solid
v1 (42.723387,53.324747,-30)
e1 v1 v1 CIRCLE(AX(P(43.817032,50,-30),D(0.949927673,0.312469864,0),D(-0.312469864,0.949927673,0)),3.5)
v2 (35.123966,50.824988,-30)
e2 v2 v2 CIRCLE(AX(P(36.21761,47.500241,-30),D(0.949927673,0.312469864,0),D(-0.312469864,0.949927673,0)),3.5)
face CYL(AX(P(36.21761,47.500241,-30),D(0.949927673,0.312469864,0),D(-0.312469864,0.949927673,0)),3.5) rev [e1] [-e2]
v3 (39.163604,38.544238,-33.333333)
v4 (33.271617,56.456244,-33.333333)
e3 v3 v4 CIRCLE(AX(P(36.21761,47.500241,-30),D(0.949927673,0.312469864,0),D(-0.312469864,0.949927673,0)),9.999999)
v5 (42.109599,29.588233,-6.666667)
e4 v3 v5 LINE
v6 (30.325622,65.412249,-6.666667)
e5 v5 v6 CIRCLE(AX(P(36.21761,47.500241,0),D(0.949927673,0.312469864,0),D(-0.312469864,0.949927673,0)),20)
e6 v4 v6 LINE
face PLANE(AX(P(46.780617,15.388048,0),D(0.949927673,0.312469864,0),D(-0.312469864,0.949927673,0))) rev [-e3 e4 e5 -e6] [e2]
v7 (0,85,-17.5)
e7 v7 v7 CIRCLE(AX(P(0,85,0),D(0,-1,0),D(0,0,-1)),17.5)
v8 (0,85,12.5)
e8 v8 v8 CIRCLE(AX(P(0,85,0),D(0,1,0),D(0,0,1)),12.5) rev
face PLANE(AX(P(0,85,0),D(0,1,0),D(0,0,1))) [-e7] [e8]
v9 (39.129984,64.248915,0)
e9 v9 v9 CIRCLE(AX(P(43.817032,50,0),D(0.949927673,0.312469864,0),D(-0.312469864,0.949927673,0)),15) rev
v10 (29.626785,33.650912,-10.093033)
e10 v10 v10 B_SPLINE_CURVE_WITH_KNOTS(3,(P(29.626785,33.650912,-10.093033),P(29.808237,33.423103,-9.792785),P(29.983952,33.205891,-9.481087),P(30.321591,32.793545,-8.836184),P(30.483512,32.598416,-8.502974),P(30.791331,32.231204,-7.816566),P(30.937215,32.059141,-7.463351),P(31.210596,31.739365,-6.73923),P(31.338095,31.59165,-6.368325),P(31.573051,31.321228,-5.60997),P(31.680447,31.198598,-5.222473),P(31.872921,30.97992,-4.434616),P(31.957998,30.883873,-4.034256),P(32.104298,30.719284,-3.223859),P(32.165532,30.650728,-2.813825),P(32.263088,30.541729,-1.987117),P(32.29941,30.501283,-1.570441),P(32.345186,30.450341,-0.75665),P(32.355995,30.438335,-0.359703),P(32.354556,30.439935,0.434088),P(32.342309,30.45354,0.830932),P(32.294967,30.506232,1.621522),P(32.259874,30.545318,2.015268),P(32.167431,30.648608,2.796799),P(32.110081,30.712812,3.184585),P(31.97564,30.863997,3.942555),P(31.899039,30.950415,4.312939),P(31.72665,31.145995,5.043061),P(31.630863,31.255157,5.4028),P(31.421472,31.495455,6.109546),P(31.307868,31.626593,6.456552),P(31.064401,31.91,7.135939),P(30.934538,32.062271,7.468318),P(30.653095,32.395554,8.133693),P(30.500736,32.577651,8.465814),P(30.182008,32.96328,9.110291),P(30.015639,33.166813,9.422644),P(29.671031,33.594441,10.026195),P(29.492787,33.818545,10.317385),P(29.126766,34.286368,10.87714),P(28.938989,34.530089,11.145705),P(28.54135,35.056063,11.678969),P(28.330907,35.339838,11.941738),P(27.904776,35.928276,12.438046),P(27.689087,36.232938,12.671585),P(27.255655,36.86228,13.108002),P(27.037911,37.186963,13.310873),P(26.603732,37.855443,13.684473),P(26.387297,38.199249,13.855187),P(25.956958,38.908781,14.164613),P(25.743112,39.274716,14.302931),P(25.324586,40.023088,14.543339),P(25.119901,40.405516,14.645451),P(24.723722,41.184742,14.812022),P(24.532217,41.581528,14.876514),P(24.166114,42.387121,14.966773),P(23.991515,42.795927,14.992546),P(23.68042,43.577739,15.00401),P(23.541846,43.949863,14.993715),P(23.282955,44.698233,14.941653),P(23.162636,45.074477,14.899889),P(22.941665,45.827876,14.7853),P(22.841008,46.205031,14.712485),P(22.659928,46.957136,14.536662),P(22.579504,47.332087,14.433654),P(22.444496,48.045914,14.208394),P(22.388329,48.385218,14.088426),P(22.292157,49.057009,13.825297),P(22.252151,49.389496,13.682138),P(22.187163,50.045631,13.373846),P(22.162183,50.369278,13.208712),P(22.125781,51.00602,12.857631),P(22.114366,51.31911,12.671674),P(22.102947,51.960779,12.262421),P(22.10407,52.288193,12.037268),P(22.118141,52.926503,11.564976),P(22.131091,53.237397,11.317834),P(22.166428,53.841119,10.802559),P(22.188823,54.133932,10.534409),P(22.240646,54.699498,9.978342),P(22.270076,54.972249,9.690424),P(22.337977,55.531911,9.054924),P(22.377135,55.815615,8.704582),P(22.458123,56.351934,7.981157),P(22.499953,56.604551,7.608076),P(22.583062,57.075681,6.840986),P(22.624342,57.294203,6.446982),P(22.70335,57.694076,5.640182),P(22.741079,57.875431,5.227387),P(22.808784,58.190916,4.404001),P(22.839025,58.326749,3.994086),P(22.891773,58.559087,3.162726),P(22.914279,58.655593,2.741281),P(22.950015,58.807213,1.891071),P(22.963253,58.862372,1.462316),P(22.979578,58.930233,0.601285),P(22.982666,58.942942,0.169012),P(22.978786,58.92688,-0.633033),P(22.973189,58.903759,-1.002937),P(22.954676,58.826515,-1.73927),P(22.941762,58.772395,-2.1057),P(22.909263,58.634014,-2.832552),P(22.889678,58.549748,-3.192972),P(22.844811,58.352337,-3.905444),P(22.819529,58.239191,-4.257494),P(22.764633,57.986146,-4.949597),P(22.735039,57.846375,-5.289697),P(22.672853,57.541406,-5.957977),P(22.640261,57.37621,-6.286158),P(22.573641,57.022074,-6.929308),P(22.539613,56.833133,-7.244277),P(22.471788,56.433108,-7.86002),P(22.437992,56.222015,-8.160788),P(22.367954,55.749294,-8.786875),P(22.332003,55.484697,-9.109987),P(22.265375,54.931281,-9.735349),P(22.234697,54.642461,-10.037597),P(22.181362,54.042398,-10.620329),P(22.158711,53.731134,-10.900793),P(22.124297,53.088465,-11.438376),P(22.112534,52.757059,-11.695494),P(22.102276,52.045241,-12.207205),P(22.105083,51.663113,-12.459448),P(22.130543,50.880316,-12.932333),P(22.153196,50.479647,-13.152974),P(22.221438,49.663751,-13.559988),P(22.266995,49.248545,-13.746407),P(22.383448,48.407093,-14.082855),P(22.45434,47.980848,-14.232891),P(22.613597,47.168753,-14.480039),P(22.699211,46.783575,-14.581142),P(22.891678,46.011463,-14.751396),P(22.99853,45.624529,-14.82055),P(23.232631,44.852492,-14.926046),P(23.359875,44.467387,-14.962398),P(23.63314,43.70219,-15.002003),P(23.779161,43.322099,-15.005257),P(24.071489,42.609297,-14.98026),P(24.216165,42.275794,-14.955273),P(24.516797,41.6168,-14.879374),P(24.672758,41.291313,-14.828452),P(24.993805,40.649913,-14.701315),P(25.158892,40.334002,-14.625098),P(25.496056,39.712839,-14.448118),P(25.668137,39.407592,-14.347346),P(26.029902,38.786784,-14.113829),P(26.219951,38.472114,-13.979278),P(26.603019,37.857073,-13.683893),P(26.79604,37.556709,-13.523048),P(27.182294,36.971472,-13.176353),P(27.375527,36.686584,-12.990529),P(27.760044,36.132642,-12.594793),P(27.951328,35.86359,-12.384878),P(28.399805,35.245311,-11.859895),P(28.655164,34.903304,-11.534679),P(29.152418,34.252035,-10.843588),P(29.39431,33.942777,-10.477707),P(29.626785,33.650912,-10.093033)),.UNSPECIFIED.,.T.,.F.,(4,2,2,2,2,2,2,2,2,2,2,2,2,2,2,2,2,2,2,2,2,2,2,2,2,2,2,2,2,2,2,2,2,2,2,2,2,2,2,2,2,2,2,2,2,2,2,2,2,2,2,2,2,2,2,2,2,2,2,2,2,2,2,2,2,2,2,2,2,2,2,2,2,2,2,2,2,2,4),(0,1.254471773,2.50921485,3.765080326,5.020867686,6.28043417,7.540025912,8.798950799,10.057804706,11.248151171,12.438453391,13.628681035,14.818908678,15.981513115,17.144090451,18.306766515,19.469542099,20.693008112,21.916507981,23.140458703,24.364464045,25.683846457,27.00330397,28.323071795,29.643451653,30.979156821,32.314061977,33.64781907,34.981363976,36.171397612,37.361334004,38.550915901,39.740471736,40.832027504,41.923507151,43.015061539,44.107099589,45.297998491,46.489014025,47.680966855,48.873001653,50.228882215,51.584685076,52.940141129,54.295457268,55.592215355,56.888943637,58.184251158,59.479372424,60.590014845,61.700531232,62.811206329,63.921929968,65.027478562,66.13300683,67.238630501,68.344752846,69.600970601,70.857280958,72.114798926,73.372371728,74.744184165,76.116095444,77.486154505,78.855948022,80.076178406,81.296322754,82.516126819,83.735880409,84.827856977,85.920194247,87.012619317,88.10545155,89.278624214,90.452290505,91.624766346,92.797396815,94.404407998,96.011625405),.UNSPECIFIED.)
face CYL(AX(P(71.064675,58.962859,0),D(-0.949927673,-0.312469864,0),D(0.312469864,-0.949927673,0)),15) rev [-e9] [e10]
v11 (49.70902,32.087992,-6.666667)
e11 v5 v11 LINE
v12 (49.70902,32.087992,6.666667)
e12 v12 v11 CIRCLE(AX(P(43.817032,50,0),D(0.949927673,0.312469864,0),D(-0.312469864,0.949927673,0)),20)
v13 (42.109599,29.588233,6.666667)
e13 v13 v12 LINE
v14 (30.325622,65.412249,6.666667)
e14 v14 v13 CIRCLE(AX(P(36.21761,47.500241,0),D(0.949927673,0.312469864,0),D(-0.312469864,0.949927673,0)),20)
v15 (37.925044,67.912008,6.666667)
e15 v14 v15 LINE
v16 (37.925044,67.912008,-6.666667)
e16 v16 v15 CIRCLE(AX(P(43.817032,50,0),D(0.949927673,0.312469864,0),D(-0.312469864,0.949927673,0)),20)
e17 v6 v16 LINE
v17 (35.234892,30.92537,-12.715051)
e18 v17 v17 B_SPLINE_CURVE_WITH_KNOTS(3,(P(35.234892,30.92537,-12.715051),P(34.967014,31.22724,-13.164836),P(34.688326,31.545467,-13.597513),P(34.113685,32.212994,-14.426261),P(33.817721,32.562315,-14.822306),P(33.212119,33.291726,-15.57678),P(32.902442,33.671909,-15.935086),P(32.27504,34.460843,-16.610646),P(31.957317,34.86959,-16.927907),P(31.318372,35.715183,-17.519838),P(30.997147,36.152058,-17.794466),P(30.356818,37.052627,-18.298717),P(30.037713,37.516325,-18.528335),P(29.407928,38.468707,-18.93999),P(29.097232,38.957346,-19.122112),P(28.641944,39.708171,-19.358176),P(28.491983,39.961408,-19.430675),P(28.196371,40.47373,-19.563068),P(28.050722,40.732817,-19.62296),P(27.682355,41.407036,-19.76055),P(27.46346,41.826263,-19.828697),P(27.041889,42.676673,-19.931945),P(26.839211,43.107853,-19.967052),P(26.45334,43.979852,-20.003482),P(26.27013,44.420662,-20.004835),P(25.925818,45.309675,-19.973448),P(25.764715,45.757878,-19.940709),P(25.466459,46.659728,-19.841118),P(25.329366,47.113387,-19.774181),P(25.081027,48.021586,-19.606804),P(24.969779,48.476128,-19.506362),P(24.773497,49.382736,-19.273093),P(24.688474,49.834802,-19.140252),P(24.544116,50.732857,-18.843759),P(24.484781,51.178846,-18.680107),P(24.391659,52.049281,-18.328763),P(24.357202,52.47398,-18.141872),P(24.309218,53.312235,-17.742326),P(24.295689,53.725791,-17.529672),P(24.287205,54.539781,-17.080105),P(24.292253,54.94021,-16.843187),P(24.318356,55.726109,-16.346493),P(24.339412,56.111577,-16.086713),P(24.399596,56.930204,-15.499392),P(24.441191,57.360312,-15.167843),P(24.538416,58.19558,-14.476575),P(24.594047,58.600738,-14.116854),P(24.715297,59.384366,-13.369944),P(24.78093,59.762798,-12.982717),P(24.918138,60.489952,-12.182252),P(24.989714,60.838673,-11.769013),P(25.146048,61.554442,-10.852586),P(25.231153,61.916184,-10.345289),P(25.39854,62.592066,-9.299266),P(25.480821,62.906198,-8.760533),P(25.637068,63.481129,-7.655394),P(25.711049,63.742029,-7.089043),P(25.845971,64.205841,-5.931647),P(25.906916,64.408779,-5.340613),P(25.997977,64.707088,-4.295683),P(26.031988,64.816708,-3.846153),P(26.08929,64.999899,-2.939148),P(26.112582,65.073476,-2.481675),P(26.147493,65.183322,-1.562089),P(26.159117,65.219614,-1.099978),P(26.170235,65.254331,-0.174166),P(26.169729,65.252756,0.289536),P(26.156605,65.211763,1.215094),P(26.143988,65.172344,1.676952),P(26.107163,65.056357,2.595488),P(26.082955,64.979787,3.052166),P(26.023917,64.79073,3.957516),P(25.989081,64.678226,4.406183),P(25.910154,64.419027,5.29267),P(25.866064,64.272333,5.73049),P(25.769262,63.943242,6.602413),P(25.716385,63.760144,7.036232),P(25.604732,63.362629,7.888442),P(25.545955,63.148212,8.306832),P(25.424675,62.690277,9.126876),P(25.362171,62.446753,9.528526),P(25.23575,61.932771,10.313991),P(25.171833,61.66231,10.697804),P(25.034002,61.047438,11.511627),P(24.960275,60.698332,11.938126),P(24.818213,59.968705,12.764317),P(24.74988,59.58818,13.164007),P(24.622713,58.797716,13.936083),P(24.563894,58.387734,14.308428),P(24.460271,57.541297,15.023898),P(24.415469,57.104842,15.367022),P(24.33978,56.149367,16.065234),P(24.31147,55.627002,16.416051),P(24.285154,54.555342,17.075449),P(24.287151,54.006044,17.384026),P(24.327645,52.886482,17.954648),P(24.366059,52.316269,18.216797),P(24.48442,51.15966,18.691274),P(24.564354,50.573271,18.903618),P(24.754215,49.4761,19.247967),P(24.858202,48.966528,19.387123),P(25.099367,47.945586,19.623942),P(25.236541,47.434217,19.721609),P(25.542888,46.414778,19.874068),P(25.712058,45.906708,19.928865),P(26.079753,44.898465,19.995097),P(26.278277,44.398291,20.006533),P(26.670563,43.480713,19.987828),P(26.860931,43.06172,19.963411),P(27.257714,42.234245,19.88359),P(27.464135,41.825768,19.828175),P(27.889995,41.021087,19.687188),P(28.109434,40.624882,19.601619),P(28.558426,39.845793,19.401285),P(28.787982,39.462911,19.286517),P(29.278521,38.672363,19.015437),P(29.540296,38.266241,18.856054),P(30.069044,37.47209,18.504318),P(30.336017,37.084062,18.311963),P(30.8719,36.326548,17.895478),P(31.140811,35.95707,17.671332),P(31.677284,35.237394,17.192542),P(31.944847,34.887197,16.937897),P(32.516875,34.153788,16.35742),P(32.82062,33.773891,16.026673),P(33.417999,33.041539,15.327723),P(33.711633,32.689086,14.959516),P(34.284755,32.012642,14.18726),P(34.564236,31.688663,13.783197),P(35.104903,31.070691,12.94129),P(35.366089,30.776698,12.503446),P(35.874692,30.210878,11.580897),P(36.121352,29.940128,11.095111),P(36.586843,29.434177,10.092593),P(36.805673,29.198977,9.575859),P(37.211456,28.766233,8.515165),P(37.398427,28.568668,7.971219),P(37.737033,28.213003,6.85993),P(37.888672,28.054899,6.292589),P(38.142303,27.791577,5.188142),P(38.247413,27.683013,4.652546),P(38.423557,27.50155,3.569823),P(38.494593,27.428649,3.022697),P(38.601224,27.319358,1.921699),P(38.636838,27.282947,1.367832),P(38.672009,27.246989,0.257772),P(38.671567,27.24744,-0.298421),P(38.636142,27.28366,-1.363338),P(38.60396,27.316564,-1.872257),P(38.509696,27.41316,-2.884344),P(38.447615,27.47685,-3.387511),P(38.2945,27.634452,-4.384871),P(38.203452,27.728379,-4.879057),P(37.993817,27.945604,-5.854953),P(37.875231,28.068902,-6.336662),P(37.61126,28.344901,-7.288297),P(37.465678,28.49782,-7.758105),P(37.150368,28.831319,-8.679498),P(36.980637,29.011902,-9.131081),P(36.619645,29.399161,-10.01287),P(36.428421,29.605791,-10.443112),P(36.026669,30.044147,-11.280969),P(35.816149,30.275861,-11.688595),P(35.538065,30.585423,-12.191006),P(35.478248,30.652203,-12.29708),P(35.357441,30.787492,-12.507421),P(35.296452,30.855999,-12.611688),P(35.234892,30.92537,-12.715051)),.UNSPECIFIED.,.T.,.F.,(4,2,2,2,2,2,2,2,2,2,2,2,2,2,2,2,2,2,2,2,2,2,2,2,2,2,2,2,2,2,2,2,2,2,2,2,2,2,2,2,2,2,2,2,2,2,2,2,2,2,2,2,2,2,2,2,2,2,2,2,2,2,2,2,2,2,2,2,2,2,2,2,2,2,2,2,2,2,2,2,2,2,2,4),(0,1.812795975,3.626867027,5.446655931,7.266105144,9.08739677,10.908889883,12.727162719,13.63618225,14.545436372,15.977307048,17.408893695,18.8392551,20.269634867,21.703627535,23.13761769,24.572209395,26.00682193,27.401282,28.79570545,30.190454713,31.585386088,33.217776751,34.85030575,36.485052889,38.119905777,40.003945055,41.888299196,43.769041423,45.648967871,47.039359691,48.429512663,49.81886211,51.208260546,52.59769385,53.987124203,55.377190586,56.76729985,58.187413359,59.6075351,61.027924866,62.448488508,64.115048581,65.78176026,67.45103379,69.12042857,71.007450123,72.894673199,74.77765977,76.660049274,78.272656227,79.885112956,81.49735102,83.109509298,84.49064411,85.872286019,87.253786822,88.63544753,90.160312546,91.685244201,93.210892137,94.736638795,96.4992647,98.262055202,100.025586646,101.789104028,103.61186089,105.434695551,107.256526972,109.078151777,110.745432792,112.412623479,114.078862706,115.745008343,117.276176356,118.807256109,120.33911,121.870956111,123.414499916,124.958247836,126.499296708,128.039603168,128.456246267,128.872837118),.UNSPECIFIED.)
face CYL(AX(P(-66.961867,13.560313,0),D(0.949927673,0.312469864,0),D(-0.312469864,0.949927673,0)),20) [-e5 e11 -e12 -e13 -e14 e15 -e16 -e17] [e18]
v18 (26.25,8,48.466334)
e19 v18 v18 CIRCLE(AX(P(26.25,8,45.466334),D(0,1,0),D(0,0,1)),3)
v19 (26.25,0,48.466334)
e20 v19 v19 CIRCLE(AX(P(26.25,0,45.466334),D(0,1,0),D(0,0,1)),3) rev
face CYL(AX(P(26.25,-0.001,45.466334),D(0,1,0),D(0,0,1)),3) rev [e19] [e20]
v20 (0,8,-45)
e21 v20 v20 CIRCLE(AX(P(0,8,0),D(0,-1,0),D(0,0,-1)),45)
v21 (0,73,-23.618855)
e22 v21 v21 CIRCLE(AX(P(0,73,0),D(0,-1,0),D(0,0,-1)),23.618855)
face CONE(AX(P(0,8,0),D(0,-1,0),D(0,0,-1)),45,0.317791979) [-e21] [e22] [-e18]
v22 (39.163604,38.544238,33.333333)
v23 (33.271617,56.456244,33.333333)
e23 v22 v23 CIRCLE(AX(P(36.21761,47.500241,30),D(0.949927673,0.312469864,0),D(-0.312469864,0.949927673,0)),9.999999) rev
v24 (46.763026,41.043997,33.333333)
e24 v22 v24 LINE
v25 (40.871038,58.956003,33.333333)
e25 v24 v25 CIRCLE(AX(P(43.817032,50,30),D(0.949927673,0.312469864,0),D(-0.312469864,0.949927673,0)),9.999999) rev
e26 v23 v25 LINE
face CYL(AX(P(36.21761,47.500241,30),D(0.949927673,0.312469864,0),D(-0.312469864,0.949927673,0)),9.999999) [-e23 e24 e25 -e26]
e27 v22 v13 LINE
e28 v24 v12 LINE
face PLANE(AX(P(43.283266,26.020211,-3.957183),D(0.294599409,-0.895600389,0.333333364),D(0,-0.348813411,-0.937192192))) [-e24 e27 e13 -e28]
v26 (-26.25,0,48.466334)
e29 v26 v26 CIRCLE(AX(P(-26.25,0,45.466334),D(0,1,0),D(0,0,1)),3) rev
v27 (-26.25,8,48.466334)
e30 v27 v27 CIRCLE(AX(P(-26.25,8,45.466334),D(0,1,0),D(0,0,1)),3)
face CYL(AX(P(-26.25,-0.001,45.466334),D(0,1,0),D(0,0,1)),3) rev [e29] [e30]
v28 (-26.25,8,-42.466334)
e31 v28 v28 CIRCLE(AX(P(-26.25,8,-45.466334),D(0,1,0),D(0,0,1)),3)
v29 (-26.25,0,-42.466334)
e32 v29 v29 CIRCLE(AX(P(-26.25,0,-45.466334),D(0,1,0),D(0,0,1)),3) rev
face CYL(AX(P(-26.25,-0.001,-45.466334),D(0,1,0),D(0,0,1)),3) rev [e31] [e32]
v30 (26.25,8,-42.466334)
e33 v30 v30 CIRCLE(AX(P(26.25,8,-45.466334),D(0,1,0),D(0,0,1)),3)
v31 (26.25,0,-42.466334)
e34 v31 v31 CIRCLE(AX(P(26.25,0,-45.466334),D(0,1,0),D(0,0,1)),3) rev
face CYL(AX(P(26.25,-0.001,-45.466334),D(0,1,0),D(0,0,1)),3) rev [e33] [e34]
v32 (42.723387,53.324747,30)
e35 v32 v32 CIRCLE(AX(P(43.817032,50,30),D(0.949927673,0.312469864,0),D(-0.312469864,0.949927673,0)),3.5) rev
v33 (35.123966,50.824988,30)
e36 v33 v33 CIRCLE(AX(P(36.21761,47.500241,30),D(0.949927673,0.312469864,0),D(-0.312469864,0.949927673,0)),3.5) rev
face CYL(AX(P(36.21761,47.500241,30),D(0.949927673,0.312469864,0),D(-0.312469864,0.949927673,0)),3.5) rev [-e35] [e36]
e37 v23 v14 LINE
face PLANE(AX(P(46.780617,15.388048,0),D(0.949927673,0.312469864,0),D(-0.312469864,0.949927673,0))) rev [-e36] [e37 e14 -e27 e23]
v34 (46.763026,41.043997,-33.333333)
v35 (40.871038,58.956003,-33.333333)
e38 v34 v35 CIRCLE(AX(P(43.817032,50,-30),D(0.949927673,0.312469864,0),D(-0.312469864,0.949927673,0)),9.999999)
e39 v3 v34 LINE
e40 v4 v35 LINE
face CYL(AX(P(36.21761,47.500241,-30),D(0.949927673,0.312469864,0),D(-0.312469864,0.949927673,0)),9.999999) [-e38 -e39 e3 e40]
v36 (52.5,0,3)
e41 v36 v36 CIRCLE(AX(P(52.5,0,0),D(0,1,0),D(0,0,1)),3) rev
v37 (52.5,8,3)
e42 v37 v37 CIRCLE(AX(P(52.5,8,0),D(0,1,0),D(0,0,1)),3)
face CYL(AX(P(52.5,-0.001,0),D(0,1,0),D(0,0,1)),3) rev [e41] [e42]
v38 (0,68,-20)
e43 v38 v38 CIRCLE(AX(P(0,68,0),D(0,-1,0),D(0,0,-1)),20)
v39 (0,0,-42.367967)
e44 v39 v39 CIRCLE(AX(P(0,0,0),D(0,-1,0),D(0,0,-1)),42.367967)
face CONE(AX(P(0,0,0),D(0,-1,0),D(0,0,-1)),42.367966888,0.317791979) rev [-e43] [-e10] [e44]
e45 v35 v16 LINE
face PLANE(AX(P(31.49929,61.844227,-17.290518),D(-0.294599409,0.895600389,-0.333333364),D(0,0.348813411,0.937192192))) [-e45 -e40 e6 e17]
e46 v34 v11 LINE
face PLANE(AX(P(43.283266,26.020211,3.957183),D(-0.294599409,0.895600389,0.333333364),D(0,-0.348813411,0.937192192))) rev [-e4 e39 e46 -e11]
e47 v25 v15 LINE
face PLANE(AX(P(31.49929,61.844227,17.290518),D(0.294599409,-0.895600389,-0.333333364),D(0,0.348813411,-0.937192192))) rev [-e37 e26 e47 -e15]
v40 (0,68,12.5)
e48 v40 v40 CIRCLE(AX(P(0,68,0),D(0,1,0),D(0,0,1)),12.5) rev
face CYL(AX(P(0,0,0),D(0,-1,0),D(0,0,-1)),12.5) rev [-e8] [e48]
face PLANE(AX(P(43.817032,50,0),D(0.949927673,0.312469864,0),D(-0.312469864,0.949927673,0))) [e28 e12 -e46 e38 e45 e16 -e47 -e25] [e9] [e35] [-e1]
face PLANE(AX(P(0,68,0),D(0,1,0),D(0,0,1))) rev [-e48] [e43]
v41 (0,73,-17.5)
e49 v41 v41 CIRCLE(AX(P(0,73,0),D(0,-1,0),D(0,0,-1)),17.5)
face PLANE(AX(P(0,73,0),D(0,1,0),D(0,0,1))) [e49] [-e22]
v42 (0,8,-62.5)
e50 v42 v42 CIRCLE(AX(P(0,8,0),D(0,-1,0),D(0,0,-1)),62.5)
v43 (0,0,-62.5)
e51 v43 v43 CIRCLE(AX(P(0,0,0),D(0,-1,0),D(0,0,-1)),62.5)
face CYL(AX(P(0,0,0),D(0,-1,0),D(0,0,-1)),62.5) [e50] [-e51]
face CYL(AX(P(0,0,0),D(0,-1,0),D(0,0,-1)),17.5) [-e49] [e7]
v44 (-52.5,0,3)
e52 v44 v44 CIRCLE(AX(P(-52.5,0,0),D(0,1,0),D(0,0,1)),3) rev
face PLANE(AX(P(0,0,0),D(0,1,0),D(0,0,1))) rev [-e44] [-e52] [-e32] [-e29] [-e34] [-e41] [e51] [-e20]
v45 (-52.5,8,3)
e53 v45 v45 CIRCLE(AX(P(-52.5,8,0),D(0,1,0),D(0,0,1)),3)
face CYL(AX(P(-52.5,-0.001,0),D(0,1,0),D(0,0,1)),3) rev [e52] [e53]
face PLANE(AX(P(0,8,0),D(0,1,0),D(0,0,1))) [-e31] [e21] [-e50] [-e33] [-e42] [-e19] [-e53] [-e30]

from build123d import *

# Parameters (mm, degrees)
SKETCH_4_W              = 17.5
SKETCH_4_H              = 11.999999999999986
SHELL_START             = 68
SHELL_1_OUTLINE_R       = 12.5
SHELL_1_DEPTH           = 17
EXTRUDE_2_REACH         = 143.612
SKETCH_7_R              = 19.99999999999999
SKETCH_8_R              = 3.500000000000001
EXTRUDE_3_DEPTH         = 8
CUT_EXTRUDE_START       = -21.159422762
CUT_EXTRUDE_1_OUTLINE_R = 15
CUT_EXTRUDE_1_DEPTH     = 21.159422762
CUT_EXTRUDE_2_REACH     = 119.224
SKETCH_9_R              = 3.0000000000000013
SKETCH_9_R_2            = 3.0000000000000018
SKETCH_9_R_3            = 2.9999999999999987
SKETCH_9_R_4            = 2.999999999999999


# Read off the part's stored shape, not the designer's step: 抽壳1, 切除-拉伸1
with BuildPart() as part:
    # 草图4 → 旋转1 (revolve)
    with BuildSketch(Plane.XY, mode=Mode.PRIVATE) as revolve_1_sk:
        with Locations((-8.75, 79)):
            Rectangle(SKETCH_4_W, SKETCH_4_H)
        Polygon((-62.5, 8), (-62.5, 0), (-42.367966888227485, 0), (-19.99999999999999, 67.99999999999997), (0, 67.99999999999997), (0, 73.00000000000001), (-17.5, 73.00000000000001), (-23.618855180370783, 73.00000000000001), (-45, 8), align=None)
    revolve(revolve_1_sk.sketch.rotate(Axis((0, 0, 0), (0, 1, 0)), 270), axis=Axis((0, 0, 0), (0, 1, 0)))

    # 抽壳1 outline → 抽壳1 (cut)
    with BuildSketch(Plane(origin=(0, 0, 0), x_dir=(1, 0, 0), z_dir=(0, 1, 0)).offset(SHELL_START)):
        Circle(SHELL_1_OUTLINE_R)
    extrude(amount=SHELL_1_DEPTH, mode=Mode.SUBTRACT)

    # 草图7 → 凸台-拉伸2 (add, up to next)
    with BuildSketch(Plane(origin=(42.98090645471225, 14.138169005955993, 0), x_dir=(0, 0, 1), z_dir=(-0.9499276731466783, -0.31246986381111624, 0)), mode=Mode.PRIVATE) as extrude_2_sk1:
        with Locations(Location((0, 33.804881714770495, 0), (0, 0, 90))):
            Circle(SKETCH_7_R)
    extrude_2_tool1 = extrude(extrude_2_sk1.sketch, amount=EXTRUDE_2_REACH, mode=Mode.PRIVATE) - part.part


with BuildPart() as body_2:
    # 草图6 → 旋转2 (revolve)
    with BuildSketch(Plane.XY):
        Polygon((32.417899669147, 46.25036163426662), (26.1685023929247, 65.24891509720017), (37.56763447068482, 68.99855346293356), (43.81703174690713, 50), align=None)
    revolve(axis=Axis((50.865675487969646, 52.31858573245586, 0), (-0.9499276731466784, -0.31246986381111624, 0)))


with BuildPart() as part_1:
    add(part.part)

    add(body_2.part)  # 凸台-拉伸2 merges body 2
    add(extrude_2_tool1.solids().sort_by_distance((32.4179, 46.250362, 0))[0])
    add(extrude_2_tool1.solids().sort_by_distance((32.4179, 46.250362, 0))[1])

    # 草图8 → 凸台-拉伸3 (add)
    # profile 1 of 2: a face of its own
    with BuildSketch(Plane(origin=(54.38003853247239, 17.88780737168939, 0), x_dir=(0, 0, -1), z_dir=(0.9499276731466783, 0.31246986381111624, 0))):
        with BuildLine():
            ThreePointArc((33.3333333333333, 24.37679227788569), (39.999999077050425, 33.804881714770474), (33.3333333333333, 43.23297115165526))
            Line((33.3333333333333, 43.23297115165526), (6.666667281966372, 52.66106232887043))
            ThreePointArc((6.666667281966377, 52.66106232887044), (16.329931806950803, 45.35188683213041), (19.99999999999999, 33.804881714770495))
            ThreePointArc((19.99999999999999, 33.80488171477049), (16.329931806950796, 22.257876597410572), (6.666667281966361, 14.948701100670544))
            Line((6.666667281966372, 14.948701100670537), (33.3333333333333, 24.376792277885695))
        make_face()
        with Locations(Location((30, 33.80488171477048, 0), (0, 0, 90))):
            Circle(SKETCH_8_R, mode=Mode.SUBTRACT)
    # profile 2 of 2: a face of its own
    with BuildSketch(Plane(origin=(54.38003853247239, 17.88780737168939, 0), x_dir=(0, 0, -1), z_dir=(0.9499276731466783, 0.31246986381111624, 0))):
        with BuildLine():
            ThreePointArc((-6.666667281966367, 14.948701100670544), (-19.99999999999999, 33.804881714770495), (-6.666667281966375, 52.66106232887044))
            Line((-6.666667281966372, 52.66106232887043), (-33.3333333333333, 43.23297115165526))
            ThreePointArc((-33.3333333333333, 43.23297115165526), (-39.999999077050425, 33.804881714770474), (-33.3333333333333, 24.37679227788569))
            Line((-33.3333333333333, 24.376792277885695), (-6.666667281966372, 14.948701100670537))
        make_face()
        with Locations(Location((-30, 33.80488171477048, 0), (0, 0, 90))):
            Circle(SKETCH_8_R, mode=Mode.SUBTRACT)
    extrude(amount=-EXTRUDE_3_DEPTH)

    # 切除-拉伸1 outline → 切除-拉伸1 (cut)
    with BuildSketch(Plane(origin=(54.38003853247239, 17.88780737168939, 0), x_dir=(0, 0, -1), z_dir=(0.9499276731466783, 0.31246986381111624, 0)).offset(CUT_EXTRUDE_START)):
        with Locations((0, 33.804881715)):
            Circle(CUT_EXTRUDE_1_OUTLINE_R)
    extrude(amount=CUT_EXTRUDE_1_DEPTH, mode=Mode.SUBTRACT)

    # 草图9 → 切除-拉伸2 (cut, up to next)
    with BuildSketch(Plane(origin=(0, 8, 0), x_dir=(1, 0, 0), z_dir=(0, 1, 0)), mode=Mode.PRIVATE) as cut_extrude_2_sk1:
        with Locations(Location((-52.5, 0, 0), (0, 0, 270))):
            Circle(SKETCH_9_R)
    cut_extrude_2_tool1 = extrude(cut_extrude_2_sk1.sketch, amount=-CUT_EXTRUDE_2_REACH, mode=Mode.PRIVATE) & part_1.part
    # 草图9 → 切除-拉伸2 (cut, up to next)
    with BuildSketch(Plane(origin=(0, 8, 0), x_dir=(1, 0, 0), z_dir=(0, 1, 0)), mode=Mode.PRIVATE) as cut_extrude_2_sk2:
        with Locations(Location((-26.249999999999893, 45.46633369868309, 0), (0, 0, 270))):
            Circle(SKETCH_9_R_2)
    cut_extrude_2_tool2 = extrude(cut_extrude_2_sk2.sketch, amount=-CUT_EXTRUDE_2_REACH, mode=Mode.PRIVATE) & part_1.part
    # 草图9 → 切除-拉伸2 (cut, up to next)
    with BuildSketch(Plane(origin=(0, 8, 0), x_dir=(1, 0, 0), z_dir=(0, 1, 0)), mode=Mode.PRIVATE) as cut_extrude_2_sk3:
        with Locations(Location((26.25000000000021, 45.46633369868293, 0), (0, 0, 270))):
            Circle(SKETCH_9_R)
    cut_extrude_2_tool3 = extrude(cut_extrude_2_sk3.sketch, amount=-CUT_EXTRUDE_2_REACH, mode=Mode.PRIVATE) & part_1.part
    # 草图9 → 切除-拉伸2 (cut, up to next)
    with BuildSketch(Plane(origin=(0, 8, 0), x_dir=(1, 0, 0), z_dir=(0, 1, 0)), mode=Mode.PRIVATE) as cut_extrude_2_sk4:
        with Locations(Location((52.5, -3.6661e-13, 0), (0, 0, 270))):
            Circle(SKETCH_9_R_2)
    cut_extrude_2_tool4 = extrude(cut_extrude_2_sk4.sketch, amount=-CUT_EXTRUDE_2_REACH, mode=Mode.PRIVATE) & part_1.part
    # 草图9 → 切除-拉伸2 (cut, up to next)
    with BuildSketch(Plane(origin=(0, 8, 0), x_dir=(1, 0, 0), z_dir=(0, 1, 0)), mode=Mode.PRIVATE) as cut_extrude_2_sk5:
        with Locations(Location((26.249999999999574, -45.46633369868327, 0), (0, 0, 270))):
            Circle(SKETCH_9_R_3)
    cut_extrude_2_tool5 = extrude(cut_extrude_2_sk5.sketch, amount=-CUT_EXTRUDE_2_REACH, mode=Mode.PRIVATE) & part_1.part
    # 草图9 → 切除-拉伸2 (cut, up to next)
    with BuildSketch(Plane(origin=(0, 8, 0), x_dir=(1, 0, 0), z_dir=(0, 1, 0)), mode=Mode.PRIVATE) as cut_extrude_2_sk6:
        with Locations(Location((-26.25000000000053, -45.46633369868272, 0), (0, 0, 270))):
            Circle(SKETCH_9_R_4)
    cut_extrude_2_tool6 = extrude(cut_extrude_2_sk6.sketch, amount=-CUT_EXTRUDE_2_REACH, mode=Mode.PRIVATE) & part_1.part
    add(cut_extrude_2_tool1.solids().sort_by_distance((-52.5, 8, 0))[0], mode=Mode.SUBTRACT)
    add(cut_extrude_2_tool2.solids().sort_by_distance((-26.25, 8, -45.466334))[0], mode=Mode.SUBTRACT)
    add(cut_extrude_2_tool3.solids().sort_by_distance((26.25, 8, -45.466334))[0], mode=Mode.SUBTRACT)
    add(cut_extrude_2_tool4.solids().sort_by_distance((52.5, 8, 0))[0], mode=Mode.SUBTRACT)
    add(cut_extrude_2_tool5.solids().sort_by_distance((26.25, 8, 45.466334))[0], mode=Mode.SUBTRACT)
    add(cut_extrude_2_tool6.solids().sort_by_distance((-26.25, 8, 45.466334))[0], mode=Mode.SUBTRACT)


solid = part_1.part
